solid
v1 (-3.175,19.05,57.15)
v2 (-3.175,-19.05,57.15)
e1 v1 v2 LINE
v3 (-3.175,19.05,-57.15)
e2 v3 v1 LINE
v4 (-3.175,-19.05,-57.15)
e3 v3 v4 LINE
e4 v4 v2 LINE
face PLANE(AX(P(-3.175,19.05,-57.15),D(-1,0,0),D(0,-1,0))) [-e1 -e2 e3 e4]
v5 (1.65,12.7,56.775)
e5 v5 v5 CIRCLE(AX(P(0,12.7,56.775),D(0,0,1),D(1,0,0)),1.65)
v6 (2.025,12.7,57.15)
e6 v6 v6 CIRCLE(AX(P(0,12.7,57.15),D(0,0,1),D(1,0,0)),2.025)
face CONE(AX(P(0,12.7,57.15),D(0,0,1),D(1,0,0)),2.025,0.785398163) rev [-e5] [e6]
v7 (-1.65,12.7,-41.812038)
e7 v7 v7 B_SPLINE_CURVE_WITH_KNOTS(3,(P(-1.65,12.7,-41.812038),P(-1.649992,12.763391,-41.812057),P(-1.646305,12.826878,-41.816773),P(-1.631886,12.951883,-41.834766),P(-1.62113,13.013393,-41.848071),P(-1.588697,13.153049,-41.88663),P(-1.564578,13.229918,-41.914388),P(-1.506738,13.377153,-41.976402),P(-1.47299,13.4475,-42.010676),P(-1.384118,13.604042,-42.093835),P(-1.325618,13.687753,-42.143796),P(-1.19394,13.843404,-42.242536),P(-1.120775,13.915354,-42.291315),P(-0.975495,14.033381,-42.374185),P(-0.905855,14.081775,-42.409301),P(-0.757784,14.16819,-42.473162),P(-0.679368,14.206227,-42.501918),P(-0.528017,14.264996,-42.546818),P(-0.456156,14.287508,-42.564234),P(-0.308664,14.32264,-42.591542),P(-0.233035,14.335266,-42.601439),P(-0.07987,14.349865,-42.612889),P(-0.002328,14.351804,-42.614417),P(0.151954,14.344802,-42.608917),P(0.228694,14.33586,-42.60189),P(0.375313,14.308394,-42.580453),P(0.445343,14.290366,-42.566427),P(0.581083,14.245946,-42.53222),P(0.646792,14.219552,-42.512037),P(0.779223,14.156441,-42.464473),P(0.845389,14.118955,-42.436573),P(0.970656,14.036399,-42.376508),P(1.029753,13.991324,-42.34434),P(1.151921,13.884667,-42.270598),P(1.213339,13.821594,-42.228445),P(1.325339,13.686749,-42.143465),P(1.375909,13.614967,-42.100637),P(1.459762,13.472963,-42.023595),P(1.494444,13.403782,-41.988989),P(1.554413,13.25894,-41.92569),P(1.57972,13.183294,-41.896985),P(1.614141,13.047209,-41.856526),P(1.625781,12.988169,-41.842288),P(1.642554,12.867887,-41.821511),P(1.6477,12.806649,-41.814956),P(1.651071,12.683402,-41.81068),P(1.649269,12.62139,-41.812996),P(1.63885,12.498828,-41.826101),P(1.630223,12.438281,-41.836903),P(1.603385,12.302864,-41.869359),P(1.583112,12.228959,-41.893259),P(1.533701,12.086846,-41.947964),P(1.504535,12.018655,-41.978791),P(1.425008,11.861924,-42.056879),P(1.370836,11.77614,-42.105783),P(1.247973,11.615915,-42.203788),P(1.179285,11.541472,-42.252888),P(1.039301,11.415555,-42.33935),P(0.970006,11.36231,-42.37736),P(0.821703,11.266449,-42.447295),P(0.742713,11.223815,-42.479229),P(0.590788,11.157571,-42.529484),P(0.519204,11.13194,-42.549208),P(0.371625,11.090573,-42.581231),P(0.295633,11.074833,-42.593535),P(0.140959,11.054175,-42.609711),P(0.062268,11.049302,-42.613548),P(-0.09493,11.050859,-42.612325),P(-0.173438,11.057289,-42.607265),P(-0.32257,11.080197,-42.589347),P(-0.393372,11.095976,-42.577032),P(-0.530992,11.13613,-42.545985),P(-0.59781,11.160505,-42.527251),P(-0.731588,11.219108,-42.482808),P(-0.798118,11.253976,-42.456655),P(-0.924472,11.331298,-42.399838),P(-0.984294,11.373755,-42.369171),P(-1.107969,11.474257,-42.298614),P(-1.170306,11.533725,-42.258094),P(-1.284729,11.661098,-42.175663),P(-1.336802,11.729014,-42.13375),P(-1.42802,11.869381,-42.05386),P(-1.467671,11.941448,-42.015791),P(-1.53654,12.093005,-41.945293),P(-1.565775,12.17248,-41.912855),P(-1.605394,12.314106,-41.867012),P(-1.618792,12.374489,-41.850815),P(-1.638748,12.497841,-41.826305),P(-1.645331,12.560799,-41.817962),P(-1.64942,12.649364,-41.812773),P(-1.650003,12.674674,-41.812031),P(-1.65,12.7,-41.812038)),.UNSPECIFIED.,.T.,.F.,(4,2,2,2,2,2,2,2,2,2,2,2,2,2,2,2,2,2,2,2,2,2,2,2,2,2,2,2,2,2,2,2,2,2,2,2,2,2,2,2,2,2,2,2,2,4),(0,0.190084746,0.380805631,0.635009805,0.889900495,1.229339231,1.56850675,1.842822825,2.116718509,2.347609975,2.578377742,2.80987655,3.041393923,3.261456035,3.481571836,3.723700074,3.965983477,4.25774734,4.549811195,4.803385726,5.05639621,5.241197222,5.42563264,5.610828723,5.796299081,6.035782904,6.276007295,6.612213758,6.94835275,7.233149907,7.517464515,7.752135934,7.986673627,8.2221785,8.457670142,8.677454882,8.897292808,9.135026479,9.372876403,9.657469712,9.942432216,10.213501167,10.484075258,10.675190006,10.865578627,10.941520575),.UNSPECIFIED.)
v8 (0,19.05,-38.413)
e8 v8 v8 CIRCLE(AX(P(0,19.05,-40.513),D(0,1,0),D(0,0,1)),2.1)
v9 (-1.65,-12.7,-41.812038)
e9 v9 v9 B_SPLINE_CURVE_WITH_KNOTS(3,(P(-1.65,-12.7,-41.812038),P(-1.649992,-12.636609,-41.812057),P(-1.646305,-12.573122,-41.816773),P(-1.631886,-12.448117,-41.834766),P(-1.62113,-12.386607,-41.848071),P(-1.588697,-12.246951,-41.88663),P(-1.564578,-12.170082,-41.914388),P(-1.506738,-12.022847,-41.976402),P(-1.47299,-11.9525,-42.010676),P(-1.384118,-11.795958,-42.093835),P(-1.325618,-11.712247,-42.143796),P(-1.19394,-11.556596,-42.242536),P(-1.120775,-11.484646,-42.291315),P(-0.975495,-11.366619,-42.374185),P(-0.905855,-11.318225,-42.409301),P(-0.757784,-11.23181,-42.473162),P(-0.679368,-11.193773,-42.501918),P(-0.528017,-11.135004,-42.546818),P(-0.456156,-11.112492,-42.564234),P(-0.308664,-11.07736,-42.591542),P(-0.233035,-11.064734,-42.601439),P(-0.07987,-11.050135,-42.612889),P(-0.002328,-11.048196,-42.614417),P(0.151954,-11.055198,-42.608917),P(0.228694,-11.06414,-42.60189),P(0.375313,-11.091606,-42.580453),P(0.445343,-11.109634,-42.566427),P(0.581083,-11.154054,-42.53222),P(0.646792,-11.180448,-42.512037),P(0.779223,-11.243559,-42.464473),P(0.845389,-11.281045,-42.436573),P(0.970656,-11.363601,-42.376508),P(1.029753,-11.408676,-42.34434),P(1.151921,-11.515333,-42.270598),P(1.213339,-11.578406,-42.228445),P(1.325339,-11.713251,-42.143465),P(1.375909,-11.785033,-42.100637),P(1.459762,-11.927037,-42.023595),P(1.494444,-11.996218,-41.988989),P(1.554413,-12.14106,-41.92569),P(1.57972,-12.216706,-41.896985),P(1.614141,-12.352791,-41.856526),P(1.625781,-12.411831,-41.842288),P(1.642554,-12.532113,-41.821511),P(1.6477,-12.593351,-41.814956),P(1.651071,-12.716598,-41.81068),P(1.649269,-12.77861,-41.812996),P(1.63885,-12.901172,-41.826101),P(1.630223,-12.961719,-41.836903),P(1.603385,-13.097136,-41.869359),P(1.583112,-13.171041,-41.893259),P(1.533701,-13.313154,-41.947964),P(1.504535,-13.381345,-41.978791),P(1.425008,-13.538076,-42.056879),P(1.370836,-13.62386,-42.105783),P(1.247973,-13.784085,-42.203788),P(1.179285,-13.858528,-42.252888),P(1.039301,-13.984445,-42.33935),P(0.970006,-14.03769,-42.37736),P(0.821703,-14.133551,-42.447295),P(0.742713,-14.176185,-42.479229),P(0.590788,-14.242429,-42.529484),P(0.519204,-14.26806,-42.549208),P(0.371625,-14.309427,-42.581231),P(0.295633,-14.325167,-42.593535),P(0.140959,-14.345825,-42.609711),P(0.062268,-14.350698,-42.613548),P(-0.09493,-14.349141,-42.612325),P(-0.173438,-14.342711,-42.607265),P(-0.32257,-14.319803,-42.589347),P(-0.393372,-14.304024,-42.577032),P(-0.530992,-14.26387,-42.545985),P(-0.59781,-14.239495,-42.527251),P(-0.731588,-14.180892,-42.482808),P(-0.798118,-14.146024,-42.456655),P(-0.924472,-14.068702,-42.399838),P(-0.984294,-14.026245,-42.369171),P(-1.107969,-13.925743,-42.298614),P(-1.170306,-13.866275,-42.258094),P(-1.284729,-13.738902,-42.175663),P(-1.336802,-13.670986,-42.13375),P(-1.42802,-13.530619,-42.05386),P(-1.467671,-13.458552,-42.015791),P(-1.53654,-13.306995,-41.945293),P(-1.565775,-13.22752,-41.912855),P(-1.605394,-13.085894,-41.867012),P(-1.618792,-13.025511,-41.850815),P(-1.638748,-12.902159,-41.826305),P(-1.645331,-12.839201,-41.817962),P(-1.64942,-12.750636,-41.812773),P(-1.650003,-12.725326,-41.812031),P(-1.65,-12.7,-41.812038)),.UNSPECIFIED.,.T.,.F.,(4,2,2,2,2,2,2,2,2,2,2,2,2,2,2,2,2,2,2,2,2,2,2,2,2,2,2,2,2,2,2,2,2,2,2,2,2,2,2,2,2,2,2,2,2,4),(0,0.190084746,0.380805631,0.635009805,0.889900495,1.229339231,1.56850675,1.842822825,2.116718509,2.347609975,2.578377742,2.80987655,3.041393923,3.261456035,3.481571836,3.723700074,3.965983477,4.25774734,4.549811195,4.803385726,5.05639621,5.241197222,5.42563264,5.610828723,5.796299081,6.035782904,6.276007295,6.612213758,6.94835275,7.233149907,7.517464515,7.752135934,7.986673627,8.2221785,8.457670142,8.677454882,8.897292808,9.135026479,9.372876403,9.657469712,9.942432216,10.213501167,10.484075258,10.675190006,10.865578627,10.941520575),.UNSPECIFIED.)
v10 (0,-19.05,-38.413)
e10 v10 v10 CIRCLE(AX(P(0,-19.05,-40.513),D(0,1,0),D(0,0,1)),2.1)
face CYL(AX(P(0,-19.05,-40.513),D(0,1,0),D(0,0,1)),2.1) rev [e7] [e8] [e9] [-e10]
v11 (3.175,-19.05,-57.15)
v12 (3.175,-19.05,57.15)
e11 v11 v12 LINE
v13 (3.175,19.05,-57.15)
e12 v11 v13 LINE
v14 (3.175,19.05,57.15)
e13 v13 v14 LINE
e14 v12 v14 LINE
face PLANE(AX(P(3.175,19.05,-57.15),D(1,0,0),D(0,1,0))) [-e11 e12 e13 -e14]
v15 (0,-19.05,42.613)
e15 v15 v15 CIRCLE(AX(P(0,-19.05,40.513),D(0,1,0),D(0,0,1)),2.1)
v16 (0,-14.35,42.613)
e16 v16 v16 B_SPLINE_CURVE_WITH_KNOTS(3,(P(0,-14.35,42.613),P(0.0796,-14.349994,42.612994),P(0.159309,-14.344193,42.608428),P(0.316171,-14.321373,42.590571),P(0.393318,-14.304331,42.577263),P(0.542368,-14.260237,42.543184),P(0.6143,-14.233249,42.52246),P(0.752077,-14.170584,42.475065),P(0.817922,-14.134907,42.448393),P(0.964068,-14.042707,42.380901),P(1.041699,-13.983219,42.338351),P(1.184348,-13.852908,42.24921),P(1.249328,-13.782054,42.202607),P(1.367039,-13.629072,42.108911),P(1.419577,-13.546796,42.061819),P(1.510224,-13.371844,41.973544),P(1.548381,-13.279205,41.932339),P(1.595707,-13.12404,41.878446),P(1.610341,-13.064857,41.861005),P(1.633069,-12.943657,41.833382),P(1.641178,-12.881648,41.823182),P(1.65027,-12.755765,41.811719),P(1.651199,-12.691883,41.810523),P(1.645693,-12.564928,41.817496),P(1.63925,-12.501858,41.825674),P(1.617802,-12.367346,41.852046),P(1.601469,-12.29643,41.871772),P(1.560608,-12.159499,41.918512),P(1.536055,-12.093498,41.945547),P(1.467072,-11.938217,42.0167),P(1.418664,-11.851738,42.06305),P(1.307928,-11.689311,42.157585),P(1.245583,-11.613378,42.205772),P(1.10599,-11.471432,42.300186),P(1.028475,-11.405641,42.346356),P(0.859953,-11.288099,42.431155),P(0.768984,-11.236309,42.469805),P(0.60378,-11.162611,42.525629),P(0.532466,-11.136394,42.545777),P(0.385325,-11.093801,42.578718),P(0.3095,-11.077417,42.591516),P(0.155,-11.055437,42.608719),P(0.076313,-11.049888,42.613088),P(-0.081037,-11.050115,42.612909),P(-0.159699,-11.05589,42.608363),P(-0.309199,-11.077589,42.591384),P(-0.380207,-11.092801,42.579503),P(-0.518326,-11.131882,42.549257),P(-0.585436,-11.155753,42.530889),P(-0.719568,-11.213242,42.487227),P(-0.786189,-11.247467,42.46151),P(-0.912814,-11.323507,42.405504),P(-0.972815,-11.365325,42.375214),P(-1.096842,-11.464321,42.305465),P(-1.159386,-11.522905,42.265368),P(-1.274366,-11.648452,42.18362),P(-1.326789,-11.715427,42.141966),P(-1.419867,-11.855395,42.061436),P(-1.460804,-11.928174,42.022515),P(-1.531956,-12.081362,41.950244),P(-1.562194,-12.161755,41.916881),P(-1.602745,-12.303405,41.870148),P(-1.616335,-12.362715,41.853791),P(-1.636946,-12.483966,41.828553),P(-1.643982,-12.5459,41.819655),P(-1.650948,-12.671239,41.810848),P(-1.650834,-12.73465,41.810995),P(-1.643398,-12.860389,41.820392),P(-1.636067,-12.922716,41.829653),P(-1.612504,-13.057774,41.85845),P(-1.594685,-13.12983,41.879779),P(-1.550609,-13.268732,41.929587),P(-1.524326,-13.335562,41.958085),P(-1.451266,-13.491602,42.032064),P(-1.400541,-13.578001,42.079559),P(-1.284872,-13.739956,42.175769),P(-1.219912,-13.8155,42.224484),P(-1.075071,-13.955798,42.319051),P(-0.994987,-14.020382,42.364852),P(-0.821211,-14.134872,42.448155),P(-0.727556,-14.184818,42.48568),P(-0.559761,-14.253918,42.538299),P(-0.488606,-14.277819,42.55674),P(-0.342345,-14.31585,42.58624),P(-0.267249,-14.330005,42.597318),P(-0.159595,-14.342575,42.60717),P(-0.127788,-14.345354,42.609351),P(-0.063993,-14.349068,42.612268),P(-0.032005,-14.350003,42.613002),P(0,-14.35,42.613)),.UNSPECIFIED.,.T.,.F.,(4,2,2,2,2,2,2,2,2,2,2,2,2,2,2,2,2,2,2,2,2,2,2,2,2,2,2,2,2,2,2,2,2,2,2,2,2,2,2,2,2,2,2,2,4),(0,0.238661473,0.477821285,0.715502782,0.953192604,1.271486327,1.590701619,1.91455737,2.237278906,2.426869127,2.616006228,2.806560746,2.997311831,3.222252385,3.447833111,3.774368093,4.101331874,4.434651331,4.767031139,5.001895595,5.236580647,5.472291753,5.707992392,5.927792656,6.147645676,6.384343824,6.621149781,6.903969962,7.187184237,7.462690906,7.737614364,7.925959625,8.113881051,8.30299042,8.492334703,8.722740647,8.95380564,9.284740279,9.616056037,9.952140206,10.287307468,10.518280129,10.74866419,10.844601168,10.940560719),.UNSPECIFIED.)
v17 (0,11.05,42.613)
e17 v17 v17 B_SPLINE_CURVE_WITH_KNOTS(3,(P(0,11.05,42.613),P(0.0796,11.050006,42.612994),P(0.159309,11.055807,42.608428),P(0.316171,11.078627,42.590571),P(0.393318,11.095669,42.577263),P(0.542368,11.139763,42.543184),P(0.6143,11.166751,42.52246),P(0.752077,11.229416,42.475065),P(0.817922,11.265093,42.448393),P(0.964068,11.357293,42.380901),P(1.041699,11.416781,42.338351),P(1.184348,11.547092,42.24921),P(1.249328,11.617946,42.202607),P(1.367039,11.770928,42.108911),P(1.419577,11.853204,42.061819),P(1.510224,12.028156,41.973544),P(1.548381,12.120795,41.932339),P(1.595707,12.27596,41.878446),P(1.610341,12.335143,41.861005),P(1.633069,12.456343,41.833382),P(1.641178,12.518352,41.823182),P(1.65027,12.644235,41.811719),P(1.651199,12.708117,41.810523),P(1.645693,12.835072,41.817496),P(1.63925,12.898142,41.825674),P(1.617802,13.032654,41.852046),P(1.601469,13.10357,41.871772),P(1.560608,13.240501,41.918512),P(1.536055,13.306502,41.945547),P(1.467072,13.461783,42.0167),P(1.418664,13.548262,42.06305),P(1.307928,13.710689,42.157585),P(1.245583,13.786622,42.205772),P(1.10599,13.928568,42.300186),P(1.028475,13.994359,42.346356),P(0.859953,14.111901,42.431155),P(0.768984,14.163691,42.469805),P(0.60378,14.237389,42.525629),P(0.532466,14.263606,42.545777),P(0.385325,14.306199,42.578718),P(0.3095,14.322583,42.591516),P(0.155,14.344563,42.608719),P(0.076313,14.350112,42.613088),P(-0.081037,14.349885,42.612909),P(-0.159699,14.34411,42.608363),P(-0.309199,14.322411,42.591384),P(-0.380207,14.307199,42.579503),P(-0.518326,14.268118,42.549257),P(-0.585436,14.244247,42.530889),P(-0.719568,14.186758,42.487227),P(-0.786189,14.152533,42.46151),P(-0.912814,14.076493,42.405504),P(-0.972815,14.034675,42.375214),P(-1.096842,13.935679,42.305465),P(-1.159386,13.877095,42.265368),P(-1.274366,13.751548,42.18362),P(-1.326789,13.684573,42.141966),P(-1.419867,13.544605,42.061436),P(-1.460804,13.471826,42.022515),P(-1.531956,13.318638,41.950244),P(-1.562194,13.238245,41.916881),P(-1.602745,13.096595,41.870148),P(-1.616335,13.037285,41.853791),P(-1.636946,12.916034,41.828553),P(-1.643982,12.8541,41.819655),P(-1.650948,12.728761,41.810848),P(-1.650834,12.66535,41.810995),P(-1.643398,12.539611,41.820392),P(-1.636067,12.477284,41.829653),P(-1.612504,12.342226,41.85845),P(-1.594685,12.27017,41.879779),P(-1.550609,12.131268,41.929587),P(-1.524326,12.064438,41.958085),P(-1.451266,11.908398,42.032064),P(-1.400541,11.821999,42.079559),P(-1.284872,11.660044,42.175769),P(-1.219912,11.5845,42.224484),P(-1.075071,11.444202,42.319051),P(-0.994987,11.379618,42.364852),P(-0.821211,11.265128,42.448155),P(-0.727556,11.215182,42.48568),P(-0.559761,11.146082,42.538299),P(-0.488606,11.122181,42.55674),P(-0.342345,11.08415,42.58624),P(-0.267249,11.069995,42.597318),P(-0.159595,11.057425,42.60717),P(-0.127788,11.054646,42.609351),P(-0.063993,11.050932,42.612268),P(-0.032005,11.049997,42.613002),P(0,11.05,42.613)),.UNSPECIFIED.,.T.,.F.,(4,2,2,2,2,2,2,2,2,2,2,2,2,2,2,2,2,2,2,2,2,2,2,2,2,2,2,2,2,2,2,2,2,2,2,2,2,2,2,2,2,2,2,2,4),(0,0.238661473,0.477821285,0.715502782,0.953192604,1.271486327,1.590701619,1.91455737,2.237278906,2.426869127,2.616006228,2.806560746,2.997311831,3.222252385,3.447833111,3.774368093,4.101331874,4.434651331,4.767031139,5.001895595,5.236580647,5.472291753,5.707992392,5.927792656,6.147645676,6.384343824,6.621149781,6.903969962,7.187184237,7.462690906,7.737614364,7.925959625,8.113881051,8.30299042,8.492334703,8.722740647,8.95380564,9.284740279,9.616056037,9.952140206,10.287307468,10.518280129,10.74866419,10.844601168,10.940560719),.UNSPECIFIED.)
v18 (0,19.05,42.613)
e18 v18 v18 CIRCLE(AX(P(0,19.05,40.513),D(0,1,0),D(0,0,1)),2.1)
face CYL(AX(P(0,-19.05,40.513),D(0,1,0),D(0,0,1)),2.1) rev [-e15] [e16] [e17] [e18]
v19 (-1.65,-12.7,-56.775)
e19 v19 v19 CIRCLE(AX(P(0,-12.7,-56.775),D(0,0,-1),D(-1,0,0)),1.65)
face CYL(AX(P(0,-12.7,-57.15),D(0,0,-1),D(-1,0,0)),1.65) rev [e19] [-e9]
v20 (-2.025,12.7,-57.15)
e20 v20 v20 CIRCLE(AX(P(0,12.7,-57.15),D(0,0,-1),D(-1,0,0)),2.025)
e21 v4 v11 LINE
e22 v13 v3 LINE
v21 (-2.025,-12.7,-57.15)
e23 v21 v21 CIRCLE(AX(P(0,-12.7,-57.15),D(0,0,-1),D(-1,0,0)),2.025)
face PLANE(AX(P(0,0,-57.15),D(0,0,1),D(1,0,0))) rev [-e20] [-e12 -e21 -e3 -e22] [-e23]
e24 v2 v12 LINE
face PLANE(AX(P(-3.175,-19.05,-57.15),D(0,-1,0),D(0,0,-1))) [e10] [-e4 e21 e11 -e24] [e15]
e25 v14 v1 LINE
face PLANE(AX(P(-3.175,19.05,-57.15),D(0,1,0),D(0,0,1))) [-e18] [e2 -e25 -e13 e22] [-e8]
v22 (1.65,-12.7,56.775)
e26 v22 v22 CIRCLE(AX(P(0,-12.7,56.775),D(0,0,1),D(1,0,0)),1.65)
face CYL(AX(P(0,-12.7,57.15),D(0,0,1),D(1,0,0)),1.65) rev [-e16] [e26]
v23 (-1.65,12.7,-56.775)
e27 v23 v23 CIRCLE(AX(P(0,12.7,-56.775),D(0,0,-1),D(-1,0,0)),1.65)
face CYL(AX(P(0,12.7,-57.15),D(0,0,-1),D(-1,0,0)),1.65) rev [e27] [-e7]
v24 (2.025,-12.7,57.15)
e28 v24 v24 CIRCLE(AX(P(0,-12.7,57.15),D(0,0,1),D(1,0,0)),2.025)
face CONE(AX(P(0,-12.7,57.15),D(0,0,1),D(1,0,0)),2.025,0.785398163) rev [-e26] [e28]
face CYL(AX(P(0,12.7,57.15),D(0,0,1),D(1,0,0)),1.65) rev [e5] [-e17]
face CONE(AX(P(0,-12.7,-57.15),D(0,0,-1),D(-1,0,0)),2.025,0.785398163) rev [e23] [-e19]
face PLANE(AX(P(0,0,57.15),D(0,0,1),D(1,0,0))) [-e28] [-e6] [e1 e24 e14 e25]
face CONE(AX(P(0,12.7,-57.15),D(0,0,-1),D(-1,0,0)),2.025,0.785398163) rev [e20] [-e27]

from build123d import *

# Parameters (mm, degrees)
BOSS_EXTRUDE1_DEPTH      = 57.15
BOSS_EXTRUDE1_DEPTH_BACK = 57.15
SKETCH1_W                = 6.35
SKETCH1_H                = 38.1
SKETCH2_R                = 2.1
CUT_EXTRUDE2_DEPTH       = 69.759094853


# Read off the part's stored shape, not the designer's step: Trou taraudé M4x0.71
with BuildPart() as part:
    # Sketch1 → Boss-Extrude1 (new, two sides: drawn at the far end of the back side and taken through both)
    with BuildSketch(Plane.XY.offset(-BOSS_EXTRUDE1_DEPTH_BACK)):
        Rectangle(SKETCH1_W, SKETCH1_H)
    extrude(amount=BOSS_EXTRUDE1_DEPTH + BOSS_EXTRUDE1_DEPTH_BACK)

    # Sketch2 → Cut-Extrude2 (cut, through all)
    with BuildSketch(Plane(origin=(0, 19.05, 0), x_dir=(1, 0, 0), z_dir=(0, 1, 0))):
        with Locations(Location((0, 40.513, 0), (0, 0, 270))):
            Circle(SKETCH2_R)
        with Locations(Location((0, -40.513, 0), (0, 0, 270))):
            Circle(SKETCH2_R)
    extrude(amount=-CUT_EXTRUDE2_DEPTH, mode=Mode.SUBTRACT)

    # Trou taraudé M4x0.71 outline → Trou taraudé M4x0.71 (revolve, cut)
    with BuildSketch(Plane.XZ.offset(12.7)):
        Polygon((0, 41.811742237), (1.65, 41.811742237), (1.65, 56.775), (2.025, 57.15), (0, 57.15), align=None)
    trou_taraud_m4x0_71 = revolve(axis=Axis((0, -12.7, 0), (0, 0, 1)), mode=Mode.SUBTRACT)

    # Trou taraud_ M4x0.71 2 outline → Trou taraud_ M4x0.71 2 (revolve, cut)
    with BuildSketch(Plane.XZ.offset(-12.7)):
        Polygon((0, 41.811742237), (1.65, 41.811742237), (1.65, 56.775), (2.025, 57.15), (0, 57.15), align=None)
    trou_taraud_m4x0_71_2 = revolve(axis=Axis((0, 12.7, 0), (0, 0, 1)), mode=Mode.SUBTRACT)

    # Symétrie1: Trou taraudé M4x0.71, Trou taraud_ M4x0.71 2 across plane
    add(trou_taraud_m4x0_71.mirror(Plane.XY), mode=Mode.SUBTRACT)
    add(trou_taraud_m4x0_71_2.mirror(Plane.XY), mode=Mode.SUBTRACT)


solid = part.part
